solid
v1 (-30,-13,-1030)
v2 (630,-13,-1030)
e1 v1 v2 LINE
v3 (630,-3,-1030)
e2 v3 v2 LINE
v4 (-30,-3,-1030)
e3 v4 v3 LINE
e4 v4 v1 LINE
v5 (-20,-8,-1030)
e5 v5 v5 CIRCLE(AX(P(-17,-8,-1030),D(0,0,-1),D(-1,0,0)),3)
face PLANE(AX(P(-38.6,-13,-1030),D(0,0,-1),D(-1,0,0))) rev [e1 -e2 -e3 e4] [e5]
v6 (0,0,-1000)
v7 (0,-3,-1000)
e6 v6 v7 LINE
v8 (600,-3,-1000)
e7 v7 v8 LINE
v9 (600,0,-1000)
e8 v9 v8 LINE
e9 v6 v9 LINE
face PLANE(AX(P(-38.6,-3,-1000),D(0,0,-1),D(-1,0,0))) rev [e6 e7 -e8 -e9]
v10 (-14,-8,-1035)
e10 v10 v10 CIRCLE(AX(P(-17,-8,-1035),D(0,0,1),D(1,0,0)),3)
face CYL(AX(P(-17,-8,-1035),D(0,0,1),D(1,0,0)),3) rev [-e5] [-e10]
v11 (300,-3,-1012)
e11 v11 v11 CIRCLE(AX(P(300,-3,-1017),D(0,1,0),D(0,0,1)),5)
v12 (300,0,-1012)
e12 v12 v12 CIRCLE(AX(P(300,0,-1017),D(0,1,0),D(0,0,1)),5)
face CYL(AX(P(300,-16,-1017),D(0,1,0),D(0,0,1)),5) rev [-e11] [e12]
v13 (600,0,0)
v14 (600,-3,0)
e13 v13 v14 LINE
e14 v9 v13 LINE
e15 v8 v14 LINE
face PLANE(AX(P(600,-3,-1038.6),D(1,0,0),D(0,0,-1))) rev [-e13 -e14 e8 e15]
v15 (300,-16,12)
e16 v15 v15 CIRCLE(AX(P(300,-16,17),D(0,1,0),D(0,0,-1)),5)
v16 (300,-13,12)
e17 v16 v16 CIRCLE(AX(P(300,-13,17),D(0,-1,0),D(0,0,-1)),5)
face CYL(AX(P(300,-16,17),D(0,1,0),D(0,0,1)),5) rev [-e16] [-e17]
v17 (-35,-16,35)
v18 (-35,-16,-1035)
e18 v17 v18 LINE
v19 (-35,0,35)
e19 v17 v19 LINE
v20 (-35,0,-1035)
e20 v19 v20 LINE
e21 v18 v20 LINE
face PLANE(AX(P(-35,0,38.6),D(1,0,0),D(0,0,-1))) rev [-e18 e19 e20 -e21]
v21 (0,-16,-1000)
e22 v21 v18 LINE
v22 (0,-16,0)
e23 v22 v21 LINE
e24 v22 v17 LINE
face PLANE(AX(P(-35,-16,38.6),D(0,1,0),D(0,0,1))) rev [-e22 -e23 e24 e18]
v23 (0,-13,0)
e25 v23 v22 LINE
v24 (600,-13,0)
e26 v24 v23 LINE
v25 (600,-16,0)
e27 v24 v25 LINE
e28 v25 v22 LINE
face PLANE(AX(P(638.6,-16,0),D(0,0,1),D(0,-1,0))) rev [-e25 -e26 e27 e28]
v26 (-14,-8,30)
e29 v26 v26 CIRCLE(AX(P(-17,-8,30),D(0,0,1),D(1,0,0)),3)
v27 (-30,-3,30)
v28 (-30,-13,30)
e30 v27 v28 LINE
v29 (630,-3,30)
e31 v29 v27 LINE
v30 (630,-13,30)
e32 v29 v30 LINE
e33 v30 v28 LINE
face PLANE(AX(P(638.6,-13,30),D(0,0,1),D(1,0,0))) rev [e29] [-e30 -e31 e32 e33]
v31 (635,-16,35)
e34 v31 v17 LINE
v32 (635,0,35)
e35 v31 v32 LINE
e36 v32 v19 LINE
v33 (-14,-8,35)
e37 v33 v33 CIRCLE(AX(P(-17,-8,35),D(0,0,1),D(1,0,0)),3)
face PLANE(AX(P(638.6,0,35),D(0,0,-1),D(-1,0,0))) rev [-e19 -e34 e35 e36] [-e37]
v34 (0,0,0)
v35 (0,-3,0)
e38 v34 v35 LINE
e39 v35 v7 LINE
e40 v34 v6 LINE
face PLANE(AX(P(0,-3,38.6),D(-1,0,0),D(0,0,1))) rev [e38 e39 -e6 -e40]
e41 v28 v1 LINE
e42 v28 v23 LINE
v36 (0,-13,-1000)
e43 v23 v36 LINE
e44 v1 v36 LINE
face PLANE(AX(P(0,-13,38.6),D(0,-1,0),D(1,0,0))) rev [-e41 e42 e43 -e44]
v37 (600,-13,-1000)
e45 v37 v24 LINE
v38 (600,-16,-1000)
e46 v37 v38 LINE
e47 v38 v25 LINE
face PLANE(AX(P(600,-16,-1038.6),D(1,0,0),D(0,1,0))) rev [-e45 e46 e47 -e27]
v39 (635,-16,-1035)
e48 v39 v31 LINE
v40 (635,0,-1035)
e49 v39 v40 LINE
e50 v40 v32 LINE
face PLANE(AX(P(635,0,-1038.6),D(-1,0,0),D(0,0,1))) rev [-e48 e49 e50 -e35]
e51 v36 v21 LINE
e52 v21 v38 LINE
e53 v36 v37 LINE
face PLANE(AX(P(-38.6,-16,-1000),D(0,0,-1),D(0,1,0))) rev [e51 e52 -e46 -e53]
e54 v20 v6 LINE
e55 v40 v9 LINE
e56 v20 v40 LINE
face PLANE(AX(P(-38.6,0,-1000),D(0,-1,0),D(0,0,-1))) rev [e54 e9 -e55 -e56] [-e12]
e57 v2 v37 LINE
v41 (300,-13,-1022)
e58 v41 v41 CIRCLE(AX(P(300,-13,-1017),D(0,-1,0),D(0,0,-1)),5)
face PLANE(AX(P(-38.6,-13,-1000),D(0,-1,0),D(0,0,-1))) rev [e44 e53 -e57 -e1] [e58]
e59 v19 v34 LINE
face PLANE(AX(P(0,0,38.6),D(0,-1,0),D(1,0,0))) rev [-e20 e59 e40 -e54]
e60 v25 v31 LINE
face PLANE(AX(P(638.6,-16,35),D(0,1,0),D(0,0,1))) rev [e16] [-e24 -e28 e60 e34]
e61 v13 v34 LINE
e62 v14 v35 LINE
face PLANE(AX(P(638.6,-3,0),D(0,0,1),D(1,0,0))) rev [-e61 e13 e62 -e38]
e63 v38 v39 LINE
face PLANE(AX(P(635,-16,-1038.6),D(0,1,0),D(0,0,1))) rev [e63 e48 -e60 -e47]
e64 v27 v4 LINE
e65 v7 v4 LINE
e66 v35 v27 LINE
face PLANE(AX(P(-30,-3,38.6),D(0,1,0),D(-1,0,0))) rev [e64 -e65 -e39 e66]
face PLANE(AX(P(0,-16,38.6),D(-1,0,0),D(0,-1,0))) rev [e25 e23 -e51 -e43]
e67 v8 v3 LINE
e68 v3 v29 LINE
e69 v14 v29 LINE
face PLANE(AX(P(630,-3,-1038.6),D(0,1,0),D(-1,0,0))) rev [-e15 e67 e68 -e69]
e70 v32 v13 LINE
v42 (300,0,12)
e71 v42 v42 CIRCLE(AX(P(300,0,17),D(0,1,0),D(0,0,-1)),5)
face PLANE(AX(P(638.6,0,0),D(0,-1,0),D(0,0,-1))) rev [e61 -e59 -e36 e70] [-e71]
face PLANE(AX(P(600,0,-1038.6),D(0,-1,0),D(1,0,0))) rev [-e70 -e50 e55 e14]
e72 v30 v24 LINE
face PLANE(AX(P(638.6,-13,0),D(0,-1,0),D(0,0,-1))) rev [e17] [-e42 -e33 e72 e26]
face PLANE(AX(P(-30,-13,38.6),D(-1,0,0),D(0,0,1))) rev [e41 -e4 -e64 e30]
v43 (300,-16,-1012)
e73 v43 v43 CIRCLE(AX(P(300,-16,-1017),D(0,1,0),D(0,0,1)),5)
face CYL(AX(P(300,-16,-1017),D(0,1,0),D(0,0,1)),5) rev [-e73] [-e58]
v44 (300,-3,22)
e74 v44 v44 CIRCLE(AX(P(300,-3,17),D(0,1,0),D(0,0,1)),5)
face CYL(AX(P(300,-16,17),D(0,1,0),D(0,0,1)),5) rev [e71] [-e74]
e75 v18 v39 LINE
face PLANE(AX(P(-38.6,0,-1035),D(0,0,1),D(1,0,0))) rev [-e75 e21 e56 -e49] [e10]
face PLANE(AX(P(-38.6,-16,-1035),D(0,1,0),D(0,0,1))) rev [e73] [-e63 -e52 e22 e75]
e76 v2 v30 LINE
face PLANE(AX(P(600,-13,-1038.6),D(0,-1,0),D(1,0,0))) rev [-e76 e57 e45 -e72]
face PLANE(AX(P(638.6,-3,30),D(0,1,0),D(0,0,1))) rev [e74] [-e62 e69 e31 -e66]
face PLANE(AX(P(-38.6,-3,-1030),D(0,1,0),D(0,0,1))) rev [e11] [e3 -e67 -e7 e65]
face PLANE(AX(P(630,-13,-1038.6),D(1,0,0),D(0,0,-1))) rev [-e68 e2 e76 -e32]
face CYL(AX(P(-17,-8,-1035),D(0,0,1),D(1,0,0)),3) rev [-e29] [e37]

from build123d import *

# Parameters (mm, degrees)
SWEEP_START           = -16
SWEEP_1_OUTLINE_W     = 670
SWEEP_1_OUTLINE_H     = 1070
SWEEP_1_OUTLINE_W_2   = 600
SWEEP_1_OUTLINE_H_2   = 1000
SWEEP_1_DEPTH         = 3
SWEEP_START_2         = -3
SWEEP_1_2_OUTLINE_W   = 670
SWEEP_1_2_OUTLINE_H   = 1070
SWEEP_1_2_OUTLINE_W_2 = 600
SWEEP_1_2_OUTLINE_H_2 = 1000
SWEEP_1_2_DEPTH       = 3
SWEEP_START_3         = -13
SWEEP_1_3_OUTLINE_W   = 670
SWEEP_1_3_OUTLINE_H   = 1070
SWEEP_1_3_OUTLINE_W_2 = 660
SWEEP_1_3_OUTLINE_H_2 = 1060
SWEEP_1_3_DEPTH       = 10
SKETCH_16_R           = 3
CUT_EXTRUDE_1_DEPTH   = 1245.339583876
SKETCH_17_R           = 5
CUT_EXTRUDE_2_DEPTH   = 1215.374736233


# Read off the part's stored shape, not the designer's step: 扫描1
with BuildPart() as part:
    # 扫描1 outline → 扫描1 (new body)
    with BuildSketch(Plane(origin=(0, 0, 0), x_dir=(1, 0, 0), z_dir=(0, 1, 0)).offset(SWEEP_START)):
        with Locations((300, 500)):
            Rectangle(SWEEP_1_OUTLINE_W, SWEEP_1_OUTLINE_H)
        with Locations((300, 500)):
            Rectangle(SWEEP_1_OUTLINE_W_2, SWEEP_1_OUTLINE_H_2, mode=Mode.SUBTRACT)
    extrude(amount=SWEEP_1_DEPTH)



with BuildPart() as body_2:
    # Sweep 1 2 outline → Sweep 1 2 (new body)
    with BuildSketch(Plane(origin=(0, 0, 0), x_dir=(1, 0, 0), z_dir=(0, 1, 0)).offset(SWEEP_START_2)):
        with Locations((300, 500)):
            Rectangle(SWEEP_1_2_OUTLINE_W, SWEEP_1_2_OUTLINE_H)
        with Locations((300, 500)):
            Rectangle(SWEEP_1_2_OUTLINE_W_2, SWEEP_1_2_OUTLINE_H_2, mode=Mode.SUBTRACT)
    extrude(amount=SWEEP_1_2_DEPTH)


with BuildPart() as part_1:
    add(part.part)

    add(body_2.part)  # Sweep 1 3 merges body 2
    # Sweep 1 3 outline → Sweep 1 3 (add)
    with BuildSketch(Plane(origin=(0, 0, 0), x_dir=(1, 0, 0), z_dir=(0, 1, 0)).offset(SWEEP_START_3)):
        with Locations((300, 500)):
            Rectangle(SWEEP_1_3_OUTLINE_W, SWEEP_1_3_OUTLINE_H)
        with Locations((300, 500)):
            Rectangle(SWEEP_1_3_OUTLINE_W_2, SWEEP_1_3_OUTLINE_H_2, mode=Mode.SUBTRACT)
    extrude(amount=SWEEP_1_3_DEPTH)

    # 草图16 → 切除-拉伸1 (cut, through all)
    with BuildSketch(Plane.XY.offset(35)):
        with Locations((-17, -8)):
            Circle(SKETCH_16_R)
    extrude(amount=-CUT_EXTRUDE_1_DEPTH, mode=Mode.SUBTRACT)

    # 草图17 → 切除-拉伸2 (cut, through all)
    with BuildSketch(Plane(origin=(0, 0, 0), x_dir=(1, 0, 0), z_dir=(0, 1, 0))):
        with Locations(Location((300, 1017, 0), (0, 0, 270))):
            Circle(SKETCH_17_R)
        with Locations(Location((300, -17, 0), (0, 0, 270))):
            Circle(SKETCH_17_R)
    extrude(amount=-CUT_EXTRUDE_2_DEPTH, mode=Mode.SUBTRACT)


solid = part_1.part
